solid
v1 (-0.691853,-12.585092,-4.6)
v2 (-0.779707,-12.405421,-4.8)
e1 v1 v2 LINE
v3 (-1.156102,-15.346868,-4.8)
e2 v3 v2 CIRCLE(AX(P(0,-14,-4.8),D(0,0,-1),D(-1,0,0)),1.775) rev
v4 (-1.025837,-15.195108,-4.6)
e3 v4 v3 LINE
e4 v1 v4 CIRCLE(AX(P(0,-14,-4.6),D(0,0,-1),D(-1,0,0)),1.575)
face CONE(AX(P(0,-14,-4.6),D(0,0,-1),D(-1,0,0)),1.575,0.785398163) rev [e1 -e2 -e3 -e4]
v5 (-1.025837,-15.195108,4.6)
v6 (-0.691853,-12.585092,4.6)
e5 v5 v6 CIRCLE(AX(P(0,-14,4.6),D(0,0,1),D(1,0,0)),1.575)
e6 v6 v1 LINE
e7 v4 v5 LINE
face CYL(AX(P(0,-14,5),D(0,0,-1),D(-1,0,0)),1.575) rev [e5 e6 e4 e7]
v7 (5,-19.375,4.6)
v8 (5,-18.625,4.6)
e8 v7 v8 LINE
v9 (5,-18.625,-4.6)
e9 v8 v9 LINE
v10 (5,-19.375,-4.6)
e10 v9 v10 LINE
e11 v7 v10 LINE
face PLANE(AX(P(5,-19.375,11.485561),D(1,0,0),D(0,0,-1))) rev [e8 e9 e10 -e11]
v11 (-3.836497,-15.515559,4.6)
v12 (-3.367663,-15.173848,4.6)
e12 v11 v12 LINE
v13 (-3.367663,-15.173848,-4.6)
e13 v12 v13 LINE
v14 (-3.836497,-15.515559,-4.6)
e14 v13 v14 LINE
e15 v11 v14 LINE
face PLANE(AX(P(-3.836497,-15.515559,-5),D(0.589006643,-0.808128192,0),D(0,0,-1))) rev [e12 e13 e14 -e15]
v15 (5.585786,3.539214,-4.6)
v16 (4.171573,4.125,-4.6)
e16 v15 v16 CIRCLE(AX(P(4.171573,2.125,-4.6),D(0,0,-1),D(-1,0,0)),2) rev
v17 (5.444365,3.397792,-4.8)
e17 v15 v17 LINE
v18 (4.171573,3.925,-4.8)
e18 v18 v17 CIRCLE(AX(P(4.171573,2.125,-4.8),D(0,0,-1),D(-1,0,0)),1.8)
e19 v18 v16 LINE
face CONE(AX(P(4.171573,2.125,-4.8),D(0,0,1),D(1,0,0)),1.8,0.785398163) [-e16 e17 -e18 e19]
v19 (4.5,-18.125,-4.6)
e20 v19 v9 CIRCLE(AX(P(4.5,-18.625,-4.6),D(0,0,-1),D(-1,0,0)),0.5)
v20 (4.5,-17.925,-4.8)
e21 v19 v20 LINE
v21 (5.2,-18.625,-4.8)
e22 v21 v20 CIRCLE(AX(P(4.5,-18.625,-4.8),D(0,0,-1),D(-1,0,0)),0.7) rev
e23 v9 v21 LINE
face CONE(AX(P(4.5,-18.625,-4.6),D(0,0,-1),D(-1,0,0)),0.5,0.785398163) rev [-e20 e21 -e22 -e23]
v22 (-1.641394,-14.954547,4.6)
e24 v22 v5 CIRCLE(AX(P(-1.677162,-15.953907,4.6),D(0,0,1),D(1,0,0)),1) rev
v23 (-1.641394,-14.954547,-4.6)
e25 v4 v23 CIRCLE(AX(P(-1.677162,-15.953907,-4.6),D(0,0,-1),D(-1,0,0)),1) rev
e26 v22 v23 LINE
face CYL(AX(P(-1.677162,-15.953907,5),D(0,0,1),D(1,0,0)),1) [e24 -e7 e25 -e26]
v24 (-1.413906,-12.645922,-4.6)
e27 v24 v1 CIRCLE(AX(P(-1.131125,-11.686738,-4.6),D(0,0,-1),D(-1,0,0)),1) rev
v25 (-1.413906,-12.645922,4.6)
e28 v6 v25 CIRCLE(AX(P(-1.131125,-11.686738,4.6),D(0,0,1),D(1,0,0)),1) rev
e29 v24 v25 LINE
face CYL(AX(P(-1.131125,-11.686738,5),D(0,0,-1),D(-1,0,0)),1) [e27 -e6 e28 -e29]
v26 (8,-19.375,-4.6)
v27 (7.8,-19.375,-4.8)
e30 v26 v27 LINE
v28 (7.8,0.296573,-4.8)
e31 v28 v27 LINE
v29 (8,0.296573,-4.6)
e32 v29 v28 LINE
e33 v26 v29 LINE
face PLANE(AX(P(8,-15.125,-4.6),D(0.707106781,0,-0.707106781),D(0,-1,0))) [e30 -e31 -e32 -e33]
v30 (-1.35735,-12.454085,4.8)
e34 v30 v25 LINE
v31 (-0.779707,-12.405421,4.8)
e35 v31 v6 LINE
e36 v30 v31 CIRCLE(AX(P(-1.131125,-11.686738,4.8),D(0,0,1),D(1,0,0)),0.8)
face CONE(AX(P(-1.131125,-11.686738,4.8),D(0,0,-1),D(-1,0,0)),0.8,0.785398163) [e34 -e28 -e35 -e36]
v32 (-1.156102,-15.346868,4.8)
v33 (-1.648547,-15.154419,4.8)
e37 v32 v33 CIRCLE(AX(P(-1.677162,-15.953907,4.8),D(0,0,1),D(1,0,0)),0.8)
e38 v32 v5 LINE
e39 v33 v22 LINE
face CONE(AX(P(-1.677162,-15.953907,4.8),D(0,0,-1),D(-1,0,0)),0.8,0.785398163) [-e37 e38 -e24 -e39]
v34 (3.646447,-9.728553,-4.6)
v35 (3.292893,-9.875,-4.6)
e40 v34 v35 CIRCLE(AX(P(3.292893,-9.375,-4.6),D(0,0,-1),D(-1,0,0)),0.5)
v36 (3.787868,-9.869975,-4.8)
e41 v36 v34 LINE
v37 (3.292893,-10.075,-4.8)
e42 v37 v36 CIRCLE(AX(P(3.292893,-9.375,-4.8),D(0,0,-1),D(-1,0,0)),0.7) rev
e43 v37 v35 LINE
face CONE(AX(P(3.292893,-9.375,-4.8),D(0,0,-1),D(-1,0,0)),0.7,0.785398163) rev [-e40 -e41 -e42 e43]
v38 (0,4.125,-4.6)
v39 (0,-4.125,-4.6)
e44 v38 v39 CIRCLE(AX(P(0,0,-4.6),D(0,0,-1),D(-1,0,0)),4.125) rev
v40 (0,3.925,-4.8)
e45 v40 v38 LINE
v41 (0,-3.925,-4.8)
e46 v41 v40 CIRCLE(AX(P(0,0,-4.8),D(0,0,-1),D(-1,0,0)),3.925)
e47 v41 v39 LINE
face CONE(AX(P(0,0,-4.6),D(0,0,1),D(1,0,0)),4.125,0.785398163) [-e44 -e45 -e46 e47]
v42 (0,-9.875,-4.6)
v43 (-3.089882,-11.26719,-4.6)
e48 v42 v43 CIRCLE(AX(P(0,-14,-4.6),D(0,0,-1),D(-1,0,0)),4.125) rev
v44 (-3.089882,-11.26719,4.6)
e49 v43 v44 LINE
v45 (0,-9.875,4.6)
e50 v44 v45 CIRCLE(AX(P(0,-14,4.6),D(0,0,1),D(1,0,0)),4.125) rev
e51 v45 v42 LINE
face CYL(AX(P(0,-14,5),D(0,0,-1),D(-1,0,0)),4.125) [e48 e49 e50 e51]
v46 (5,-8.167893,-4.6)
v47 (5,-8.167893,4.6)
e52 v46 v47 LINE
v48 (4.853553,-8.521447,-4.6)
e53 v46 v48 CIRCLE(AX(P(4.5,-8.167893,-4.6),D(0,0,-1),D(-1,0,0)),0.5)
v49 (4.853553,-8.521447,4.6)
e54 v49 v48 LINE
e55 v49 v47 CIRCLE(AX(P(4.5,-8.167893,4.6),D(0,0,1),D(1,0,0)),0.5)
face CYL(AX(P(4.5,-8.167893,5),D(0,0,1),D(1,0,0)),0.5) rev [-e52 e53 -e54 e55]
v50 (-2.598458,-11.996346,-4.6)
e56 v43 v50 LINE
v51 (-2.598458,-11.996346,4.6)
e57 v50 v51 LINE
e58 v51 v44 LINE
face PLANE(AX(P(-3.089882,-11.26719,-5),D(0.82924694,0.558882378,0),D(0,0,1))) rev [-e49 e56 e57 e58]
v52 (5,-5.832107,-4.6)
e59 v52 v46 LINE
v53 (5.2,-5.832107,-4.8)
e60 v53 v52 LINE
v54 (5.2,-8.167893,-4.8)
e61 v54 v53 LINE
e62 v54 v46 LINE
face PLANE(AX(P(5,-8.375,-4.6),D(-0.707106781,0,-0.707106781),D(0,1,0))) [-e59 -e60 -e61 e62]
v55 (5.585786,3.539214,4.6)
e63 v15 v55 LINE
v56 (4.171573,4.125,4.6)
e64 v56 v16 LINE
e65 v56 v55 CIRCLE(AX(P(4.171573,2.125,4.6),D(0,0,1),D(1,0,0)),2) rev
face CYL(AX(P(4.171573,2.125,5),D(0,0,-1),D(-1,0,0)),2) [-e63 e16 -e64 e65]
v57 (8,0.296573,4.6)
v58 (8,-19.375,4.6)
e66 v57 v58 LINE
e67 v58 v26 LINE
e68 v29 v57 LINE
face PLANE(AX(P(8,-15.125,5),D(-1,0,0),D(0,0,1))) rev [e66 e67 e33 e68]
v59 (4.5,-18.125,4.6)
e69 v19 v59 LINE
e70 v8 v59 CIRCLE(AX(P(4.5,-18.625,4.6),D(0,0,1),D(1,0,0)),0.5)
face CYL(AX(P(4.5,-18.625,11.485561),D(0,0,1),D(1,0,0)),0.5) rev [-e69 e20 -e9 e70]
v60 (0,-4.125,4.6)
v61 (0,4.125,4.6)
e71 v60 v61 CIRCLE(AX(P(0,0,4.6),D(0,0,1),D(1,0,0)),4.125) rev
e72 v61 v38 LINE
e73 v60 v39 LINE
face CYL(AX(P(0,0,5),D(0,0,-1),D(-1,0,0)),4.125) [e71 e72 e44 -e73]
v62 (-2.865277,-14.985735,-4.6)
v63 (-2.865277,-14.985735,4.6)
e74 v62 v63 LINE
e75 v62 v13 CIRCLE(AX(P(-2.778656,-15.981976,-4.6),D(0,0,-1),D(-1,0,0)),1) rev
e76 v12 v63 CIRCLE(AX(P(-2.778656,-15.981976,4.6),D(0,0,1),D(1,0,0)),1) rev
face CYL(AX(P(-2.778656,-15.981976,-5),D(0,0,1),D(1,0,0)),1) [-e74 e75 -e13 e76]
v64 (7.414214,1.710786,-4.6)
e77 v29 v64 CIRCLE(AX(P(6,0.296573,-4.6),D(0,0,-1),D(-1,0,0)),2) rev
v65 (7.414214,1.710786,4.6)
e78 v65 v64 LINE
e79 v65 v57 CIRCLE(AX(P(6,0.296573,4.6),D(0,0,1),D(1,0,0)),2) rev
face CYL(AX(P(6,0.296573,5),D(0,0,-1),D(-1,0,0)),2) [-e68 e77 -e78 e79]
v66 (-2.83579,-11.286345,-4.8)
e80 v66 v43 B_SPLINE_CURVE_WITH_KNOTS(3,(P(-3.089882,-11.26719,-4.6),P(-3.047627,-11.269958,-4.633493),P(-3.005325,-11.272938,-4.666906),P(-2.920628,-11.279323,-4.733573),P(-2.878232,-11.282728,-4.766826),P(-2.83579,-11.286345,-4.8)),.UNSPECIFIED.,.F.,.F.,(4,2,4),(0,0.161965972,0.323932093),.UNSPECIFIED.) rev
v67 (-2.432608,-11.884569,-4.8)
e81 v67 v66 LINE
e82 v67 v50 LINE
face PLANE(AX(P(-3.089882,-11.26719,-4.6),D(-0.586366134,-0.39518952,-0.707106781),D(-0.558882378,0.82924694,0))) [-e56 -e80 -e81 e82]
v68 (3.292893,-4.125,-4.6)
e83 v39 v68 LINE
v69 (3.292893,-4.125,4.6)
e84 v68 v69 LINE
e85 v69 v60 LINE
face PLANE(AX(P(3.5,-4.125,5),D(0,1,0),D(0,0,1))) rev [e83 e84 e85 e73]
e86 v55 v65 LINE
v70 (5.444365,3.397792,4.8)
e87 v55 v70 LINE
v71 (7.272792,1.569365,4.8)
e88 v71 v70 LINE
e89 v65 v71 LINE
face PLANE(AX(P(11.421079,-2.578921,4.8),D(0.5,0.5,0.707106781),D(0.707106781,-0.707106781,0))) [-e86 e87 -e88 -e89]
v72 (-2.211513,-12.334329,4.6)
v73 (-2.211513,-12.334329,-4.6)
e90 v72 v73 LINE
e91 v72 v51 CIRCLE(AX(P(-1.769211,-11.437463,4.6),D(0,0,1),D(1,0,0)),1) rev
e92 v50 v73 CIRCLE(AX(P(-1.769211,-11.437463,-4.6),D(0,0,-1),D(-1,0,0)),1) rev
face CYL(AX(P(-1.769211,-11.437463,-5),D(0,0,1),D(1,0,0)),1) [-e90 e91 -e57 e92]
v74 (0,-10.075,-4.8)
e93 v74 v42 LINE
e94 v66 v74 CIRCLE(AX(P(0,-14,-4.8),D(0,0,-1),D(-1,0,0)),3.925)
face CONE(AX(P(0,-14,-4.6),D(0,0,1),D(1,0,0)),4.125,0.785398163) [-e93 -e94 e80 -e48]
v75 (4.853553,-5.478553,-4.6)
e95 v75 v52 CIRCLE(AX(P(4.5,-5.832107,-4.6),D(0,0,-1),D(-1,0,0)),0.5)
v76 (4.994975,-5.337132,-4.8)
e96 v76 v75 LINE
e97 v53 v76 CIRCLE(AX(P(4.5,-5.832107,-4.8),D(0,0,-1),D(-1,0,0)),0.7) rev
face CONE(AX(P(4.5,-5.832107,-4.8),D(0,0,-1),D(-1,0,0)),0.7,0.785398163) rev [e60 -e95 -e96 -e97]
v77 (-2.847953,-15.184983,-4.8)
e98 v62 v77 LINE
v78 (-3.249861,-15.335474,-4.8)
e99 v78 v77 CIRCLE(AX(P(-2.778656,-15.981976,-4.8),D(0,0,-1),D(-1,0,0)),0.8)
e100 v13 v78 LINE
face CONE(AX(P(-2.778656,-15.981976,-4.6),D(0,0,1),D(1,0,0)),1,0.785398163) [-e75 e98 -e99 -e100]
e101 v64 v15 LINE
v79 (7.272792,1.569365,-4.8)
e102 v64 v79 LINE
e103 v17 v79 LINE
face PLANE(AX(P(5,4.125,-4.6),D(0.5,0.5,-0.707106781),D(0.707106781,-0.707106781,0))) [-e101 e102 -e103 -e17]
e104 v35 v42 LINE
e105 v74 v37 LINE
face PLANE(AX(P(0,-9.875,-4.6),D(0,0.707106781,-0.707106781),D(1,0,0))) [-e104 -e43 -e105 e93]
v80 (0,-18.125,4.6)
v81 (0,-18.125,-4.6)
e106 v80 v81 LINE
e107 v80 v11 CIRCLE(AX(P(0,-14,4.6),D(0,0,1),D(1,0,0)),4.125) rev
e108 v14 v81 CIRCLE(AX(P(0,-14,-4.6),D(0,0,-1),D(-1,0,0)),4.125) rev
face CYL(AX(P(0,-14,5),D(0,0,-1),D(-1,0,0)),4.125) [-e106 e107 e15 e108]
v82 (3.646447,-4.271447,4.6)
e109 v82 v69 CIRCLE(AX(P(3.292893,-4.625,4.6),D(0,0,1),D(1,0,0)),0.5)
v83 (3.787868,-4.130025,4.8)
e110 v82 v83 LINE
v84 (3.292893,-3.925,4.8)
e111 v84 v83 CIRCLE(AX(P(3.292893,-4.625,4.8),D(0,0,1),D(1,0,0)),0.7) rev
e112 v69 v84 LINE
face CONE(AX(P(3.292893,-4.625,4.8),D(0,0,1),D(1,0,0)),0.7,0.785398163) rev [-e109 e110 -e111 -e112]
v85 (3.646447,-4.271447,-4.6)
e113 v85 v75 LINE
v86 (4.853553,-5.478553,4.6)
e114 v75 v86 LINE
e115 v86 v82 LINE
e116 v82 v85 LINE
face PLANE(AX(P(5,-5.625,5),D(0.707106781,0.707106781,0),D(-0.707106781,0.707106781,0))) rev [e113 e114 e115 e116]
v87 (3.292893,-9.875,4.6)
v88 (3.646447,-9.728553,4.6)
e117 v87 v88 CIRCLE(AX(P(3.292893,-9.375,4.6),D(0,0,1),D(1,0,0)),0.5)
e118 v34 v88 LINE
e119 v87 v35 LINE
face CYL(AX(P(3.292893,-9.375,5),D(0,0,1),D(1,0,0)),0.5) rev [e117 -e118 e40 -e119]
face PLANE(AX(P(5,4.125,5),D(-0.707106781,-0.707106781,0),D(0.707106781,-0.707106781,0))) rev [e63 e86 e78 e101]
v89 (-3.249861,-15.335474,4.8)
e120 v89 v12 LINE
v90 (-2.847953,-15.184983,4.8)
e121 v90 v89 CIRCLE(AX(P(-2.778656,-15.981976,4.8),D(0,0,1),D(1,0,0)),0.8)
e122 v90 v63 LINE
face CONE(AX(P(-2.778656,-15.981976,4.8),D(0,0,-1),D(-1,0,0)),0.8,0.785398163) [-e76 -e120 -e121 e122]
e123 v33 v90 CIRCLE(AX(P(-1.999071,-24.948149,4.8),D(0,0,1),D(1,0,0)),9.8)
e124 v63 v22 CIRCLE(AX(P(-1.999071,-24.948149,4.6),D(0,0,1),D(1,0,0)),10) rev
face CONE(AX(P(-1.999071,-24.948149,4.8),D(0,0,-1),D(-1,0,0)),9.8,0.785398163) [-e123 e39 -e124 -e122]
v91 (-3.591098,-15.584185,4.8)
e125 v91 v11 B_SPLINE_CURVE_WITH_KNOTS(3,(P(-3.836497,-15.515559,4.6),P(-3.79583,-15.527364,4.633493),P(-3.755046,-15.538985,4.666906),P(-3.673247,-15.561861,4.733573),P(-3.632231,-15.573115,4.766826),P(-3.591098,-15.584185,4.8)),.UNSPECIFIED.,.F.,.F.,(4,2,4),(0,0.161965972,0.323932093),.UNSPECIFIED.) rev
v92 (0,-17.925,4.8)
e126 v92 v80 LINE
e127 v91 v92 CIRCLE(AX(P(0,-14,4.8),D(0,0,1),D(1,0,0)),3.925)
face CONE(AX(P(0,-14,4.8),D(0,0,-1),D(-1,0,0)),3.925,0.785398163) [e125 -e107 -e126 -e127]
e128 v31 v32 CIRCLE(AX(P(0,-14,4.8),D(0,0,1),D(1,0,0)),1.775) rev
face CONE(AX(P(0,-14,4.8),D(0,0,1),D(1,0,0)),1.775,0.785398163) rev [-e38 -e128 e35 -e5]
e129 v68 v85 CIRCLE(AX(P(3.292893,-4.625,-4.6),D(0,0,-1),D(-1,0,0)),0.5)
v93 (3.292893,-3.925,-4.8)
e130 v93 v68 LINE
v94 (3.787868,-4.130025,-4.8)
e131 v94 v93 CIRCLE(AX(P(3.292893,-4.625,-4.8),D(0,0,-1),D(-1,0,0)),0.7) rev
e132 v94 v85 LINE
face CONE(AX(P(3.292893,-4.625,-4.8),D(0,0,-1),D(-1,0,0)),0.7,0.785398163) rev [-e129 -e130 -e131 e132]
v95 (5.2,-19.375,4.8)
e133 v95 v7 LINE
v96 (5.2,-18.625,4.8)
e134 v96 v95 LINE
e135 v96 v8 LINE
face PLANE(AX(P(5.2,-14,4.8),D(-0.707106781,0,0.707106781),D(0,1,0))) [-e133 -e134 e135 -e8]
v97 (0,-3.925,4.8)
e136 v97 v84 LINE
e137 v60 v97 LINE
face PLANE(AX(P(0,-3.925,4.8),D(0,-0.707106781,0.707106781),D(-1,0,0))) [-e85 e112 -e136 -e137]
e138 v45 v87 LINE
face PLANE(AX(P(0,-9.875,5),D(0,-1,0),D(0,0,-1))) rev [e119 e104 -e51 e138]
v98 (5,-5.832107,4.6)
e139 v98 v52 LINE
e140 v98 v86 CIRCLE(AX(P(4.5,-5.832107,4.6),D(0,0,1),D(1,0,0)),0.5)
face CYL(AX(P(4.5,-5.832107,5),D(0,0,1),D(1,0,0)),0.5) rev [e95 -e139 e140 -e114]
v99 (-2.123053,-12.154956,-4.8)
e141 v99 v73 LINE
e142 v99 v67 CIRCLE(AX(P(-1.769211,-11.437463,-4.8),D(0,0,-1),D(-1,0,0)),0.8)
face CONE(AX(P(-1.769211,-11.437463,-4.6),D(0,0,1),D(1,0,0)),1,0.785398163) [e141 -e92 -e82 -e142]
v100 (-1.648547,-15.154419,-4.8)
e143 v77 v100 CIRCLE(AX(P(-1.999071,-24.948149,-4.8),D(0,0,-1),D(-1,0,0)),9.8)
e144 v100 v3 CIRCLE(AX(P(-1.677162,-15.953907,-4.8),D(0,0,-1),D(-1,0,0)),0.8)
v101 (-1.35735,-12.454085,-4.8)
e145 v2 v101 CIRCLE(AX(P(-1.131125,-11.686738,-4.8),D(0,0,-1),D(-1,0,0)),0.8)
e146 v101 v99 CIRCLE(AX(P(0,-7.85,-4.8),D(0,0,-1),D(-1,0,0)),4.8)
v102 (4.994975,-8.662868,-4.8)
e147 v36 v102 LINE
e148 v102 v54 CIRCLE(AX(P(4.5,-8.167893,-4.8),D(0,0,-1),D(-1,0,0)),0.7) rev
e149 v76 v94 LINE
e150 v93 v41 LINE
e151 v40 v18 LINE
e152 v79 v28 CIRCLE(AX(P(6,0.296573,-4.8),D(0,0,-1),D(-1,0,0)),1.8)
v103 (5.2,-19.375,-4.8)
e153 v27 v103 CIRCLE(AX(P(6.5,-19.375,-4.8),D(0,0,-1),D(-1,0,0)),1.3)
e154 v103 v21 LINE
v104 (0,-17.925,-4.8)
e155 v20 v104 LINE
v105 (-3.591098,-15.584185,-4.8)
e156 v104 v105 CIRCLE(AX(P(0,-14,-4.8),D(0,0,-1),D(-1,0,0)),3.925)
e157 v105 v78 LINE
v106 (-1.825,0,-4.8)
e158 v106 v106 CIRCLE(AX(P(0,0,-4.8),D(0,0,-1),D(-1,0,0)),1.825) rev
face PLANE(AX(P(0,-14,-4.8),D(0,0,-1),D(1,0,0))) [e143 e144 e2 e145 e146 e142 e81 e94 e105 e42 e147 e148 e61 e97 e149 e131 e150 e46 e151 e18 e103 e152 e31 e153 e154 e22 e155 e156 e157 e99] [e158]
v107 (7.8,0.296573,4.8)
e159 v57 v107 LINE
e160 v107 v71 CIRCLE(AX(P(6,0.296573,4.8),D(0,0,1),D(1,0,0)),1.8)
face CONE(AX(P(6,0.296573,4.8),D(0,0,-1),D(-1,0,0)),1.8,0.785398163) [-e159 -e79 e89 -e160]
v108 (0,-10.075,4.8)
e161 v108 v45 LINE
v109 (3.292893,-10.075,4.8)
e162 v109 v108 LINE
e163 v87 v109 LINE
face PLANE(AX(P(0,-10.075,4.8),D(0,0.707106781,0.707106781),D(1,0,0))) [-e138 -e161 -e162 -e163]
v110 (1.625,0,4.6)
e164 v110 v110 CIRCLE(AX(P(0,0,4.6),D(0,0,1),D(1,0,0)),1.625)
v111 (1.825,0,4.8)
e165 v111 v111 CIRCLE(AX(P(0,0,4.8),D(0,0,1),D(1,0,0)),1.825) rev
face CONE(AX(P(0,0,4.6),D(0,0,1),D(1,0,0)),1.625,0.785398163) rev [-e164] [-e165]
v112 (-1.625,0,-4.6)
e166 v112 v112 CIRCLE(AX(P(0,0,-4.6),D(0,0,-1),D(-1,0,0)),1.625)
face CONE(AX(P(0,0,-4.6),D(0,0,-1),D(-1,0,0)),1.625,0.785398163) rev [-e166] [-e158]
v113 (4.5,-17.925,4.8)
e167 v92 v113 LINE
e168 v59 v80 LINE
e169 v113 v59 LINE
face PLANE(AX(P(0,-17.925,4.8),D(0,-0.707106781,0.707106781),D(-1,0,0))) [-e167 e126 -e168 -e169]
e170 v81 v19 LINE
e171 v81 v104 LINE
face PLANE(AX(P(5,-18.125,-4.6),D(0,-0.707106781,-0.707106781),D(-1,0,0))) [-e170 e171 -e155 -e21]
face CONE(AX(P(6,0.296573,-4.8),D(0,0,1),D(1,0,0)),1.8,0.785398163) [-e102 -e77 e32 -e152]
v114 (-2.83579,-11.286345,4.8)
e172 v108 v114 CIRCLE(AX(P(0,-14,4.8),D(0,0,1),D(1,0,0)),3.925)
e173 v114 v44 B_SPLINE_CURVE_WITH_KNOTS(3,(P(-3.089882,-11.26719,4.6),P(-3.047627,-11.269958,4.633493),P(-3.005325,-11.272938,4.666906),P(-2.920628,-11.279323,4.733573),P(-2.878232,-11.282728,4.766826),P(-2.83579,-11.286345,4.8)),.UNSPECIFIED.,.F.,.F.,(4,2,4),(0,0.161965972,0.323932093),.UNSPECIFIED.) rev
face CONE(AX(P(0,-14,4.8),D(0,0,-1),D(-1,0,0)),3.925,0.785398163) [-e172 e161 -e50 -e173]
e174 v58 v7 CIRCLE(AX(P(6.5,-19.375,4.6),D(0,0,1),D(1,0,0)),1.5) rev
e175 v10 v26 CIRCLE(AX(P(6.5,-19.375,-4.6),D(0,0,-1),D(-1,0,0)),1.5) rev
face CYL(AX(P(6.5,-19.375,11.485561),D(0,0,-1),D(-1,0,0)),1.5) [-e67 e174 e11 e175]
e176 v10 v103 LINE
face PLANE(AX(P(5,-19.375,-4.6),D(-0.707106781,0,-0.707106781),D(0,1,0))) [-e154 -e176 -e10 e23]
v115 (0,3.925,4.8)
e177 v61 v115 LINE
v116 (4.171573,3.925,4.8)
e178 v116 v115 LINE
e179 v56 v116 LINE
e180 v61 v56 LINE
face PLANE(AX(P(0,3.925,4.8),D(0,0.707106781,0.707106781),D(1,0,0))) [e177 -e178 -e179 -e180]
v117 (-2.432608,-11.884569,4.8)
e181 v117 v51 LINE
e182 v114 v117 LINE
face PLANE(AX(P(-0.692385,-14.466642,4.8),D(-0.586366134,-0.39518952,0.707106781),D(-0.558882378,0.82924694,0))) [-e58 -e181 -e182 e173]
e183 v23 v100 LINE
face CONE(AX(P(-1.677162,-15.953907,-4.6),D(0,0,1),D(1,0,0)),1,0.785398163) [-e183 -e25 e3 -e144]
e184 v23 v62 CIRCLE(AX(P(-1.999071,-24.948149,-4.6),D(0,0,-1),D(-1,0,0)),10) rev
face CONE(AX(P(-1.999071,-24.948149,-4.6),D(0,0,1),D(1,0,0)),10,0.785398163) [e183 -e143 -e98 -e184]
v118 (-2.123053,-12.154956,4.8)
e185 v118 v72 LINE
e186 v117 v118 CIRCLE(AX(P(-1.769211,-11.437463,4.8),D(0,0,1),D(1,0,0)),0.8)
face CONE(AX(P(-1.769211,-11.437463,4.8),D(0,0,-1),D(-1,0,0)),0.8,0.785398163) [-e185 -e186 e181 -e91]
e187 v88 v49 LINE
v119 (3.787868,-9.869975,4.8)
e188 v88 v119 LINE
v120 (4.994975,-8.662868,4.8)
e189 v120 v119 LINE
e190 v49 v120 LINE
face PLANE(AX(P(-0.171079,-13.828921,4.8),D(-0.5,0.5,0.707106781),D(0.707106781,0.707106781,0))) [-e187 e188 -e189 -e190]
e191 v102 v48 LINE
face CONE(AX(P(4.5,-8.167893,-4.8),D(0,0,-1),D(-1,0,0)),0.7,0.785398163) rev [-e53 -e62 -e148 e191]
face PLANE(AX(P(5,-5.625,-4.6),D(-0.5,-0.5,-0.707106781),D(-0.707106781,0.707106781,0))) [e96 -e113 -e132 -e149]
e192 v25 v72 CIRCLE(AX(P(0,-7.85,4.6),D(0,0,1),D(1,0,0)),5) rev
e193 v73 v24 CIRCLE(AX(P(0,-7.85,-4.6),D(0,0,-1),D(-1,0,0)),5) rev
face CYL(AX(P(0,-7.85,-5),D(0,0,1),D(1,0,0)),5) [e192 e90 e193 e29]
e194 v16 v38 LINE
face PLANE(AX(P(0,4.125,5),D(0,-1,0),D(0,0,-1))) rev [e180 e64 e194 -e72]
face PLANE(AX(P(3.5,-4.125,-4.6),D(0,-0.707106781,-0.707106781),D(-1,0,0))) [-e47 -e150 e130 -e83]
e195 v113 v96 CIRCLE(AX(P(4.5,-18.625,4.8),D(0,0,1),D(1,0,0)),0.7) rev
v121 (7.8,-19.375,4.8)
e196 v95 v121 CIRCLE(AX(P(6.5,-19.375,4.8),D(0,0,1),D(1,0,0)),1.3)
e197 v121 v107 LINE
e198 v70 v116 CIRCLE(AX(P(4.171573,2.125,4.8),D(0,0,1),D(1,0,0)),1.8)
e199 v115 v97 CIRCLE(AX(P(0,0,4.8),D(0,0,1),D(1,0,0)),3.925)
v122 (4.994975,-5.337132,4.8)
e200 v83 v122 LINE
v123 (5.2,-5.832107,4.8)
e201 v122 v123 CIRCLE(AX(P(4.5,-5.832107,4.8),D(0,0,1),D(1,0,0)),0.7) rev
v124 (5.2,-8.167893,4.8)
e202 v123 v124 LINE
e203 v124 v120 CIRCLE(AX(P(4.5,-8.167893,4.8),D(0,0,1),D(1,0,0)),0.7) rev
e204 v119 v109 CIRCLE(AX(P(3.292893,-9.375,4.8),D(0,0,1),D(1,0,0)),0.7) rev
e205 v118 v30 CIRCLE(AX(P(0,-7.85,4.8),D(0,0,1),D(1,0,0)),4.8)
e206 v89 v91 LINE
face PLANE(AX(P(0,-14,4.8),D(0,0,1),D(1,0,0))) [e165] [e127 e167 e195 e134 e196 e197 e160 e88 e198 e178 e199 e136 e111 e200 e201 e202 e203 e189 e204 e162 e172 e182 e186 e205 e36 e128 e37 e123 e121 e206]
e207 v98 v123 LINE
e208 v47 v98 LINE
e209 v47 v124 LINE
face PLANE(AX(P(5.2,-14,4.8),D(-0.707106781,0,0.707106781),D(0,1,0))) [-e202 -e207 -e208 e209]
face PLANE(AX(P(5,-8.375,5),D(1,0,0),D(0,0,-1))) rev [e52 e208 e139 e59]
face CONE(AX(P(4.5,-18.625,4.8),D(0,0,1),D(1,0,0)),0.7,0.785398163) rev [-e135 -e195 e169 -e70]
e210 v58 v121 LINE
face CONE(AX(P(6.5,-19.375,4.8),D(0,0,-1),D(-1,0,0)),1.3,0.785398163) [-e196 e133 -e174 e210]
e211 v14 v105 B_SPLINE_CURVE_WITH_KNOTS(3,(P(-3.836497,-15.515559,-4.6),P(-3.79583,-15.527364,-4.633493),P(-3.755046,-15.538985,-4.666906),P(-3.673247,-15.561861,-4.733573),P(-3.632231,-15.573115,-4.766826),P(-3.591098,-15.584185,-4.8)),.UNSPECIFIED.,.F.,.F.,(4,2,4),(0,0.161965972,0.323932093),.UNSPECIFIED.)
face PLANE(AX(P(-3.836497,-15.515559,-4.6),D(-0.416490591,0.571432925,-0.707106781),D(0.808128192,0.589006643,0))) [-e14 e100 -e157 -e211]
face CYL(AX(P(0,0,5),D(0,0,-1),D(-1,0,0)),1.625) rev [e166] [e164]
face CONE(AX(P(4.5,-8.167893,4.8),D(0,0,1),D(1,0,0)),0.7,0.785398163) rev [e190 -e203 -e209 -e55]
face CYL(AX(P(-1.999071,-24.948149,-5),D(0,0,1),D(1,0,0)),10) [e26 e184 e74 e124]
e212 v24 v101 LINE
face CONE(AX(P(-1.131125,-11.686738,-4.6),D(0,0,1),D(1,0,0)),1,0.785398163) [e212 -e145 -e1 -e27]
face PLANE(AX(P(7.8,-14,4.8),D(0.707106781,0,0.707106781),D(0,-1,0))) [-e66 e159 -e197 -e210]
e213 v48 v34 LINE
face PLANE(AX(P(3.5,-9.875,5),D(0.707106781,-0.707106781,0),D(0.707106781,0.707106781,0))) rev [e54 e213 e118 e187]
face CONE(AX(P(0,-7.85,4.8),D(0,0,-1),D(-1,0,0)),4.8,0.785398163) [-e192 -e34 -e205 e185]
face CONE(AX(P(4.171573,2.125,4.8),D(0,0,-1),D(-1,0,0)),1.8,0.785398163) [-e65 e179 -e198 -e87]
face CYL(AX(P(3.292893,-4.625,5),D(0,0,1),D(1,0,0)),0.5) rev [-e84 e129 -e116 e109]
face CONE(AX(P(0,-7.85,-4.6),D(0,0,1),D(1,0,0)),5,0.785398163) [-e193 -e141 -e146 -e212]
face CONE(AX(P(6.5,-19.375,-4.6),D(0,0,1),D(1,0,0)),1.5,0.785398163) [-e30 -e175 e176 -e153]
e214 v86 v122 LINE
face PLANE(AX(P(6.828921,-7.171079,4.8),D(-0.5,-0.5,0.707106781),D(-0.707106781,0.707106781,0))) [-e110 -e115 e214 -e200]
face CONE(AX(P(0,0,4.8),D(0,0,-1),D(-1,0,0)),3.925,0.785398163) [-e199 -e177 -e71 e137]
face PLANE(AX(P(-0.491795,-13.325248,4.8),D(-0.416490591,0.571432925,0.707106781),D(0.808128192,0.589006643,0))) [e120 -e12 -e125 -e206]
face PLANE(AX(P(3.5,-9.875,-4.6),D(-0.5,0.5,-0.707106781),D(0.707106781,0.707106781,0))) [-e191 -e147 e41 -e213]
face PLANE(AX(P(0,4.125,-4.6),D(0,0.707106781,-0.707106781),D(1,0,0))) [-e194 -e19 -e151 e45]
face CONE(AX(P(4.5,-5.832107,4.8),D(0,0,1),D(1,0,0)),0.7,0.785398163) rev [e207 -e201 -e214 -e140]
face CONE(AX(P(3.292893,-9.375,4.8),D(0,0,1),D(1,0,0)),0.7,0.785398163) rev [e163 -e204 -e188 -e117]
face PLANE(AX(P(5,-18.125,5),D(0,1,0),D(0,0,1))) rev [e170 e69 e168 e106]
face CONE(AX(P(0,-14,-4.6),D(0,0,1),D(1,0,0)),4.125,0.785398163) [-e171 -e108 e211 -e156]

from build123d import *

# Parameters (mm, degrees)
SKETCH2_R                         = 1.575
SKETCH2_R_2                       = 1.625
BOSS_EXTRUDE1_DEPTH               = 5
LATCH_NOTCH_DEPTH                 = 21.433199089
LATCH_NOTCH_DEPTH_BACK            = 21.433199089
FILLET2_R                         = 1
THUMB_BUMP_LONG_REACH             = 22.433
THUMB_BUMP_LONG_DIRECTION_2_REACH = 22.433
FILLET6_R                         = 0.5
MOVEMENT_CLEARANCE_DEPTH          = 0.2
FILLET3_R                         = 2
FILLET4_R                         = 0.5
CHAMFER2_SIZE                     = 0.2


with BuildPart() as part:
    # Sketch2 → Boss-Extrude1 (new, symmetric)
    with BuildSketch(Plane.XY):
        with BuildLine():
            Line((8, -15.125), (8, 1.125))
            Line((8, 1.125), (5, 4.125))
            Line((5, 4.125), (0, 4.125))
            ThreePointArc((0, 4.125), (-4.125, 0), (0, -4.125))
            Line((0, -4.125), (3.5, -4.125))
            Line((3.5, -4.125), (5, -5.625))
            Line((5, -5.625), (5, -8.375))
            Line((5, -8.375), (3.5, -9.875))
            Line((3.5, -9.875), (0, -9.875))
            ThreePointArc((0, -9.875), (-4.125, -14), (0, -18.125))
            Line((0, -18.125), (5, -18.125))
            Line((5, -18.125), (8, -15.125))
        make_face()
        with Locations((0, -14)):
            Circle(SKETCH2_R, mode=Mode.SUBTRACT)
        Circle(SKETCH2_R_2, mode=Mode.SUBTRACT)
    extrude(amount=BOSS_EXTRUDE1_DEPTH, both=True)

    # Sketch3 → Latch Notch (cut, two sides: drawn at the far end of the back side and taken through both)
    with BuildSketch(Plane.XY.offset(-LATCH_NOTCH_DEPTH_BACK)):
        with BuildLine():
            Line((-5.189425986, -13.053442339), (-4.352006159, -10.311715335))
            ThreePointArc((-4.352006159, -10.311715335), (-2.519069602, -12.169061048), (0, -12.85))
            Line((0, -12.85), (0, -15.15))
            ThreePointArc((0, -15.15), (-3.063481939, -15.004958499), (-6.026845813, -15.795169343))
            Line((-6.026845813, -15.795169343), (-5.189425986, -13.053442339))
        make_face()
    extrude(amount=LATCH_NOTCH_DEPTH + LATCH_NOTCH_DEPTH_BACK, mode=Mode.SUBTRACT)

    # Chamfer1
    # the kernel refuses this chamfer: 1.535901437, 0.897551306, 0.4 mm, written as the material it takes off along each edge
    with BuildSketch(Plane(origin=(-3.336286816, -11.574136179, -7.844626154), x_dir=(0.8125376228226495, -0.5829087505756949, 0), z_dir=(0, 0, 1))) as chamfer1_piece_1:
        with BuildLine():
            Line((1.080053984, 0), (0.021291111, 0.393036797))
            ThreePointArc((0.021291111, 0.393036797), (0.006455038, 0.205821568), (0, 0))
            ThreePointArc((0, 0), (0.568931585, -0.029164914), (1.080053984, 0))
        make_face()
    extrude(amount=15.689252309, mode=Mode.SUBTRACT)
    with BuildSketch(Plane(origin=(-3.96348247, -15.142992437, -7.141629453), x_dir=(0.3226160511275448, -0.9465299168831746, 0), z_dir=(0, 0, 1))) as chamfer1_piece_2:
        with BuildLine():
            Line((0.393613053, 0), (0.141125799, 0.8123737))
            ThreePointArc((0.141125799, 0.8123737), (0.064933685, 0.423381867), (0, 0))
            ThreePointArc((0, 0), (0.202118313, -0.004694141), (0.393613053, 0))
        make_face()
    extrude(amount=14.283258906, mode=Mode.SUBTRACT)

    # Fillet2
    fillet2_edges = [part.edges().sort_by_distance(p)[0] for p in [
        (-1.235054025, -14.977377387, 0),
        (-0.965763736, -12.755843496, 0),
        (-3.149017011, -15.014487433, 0),
        (-2.45870232, -12.203709097, 0),
    ]]
    fillet(fillet2_edges, radius=FILLET2_R)

    # Thumb Bump LONG: up to this face of the body (flat: up to its plane)
    thumb_bump_long_end = Plane(part.part.faces().sort_by_distance((-2.247358014, -15.204704165, 5))[0])
    # Sketch6 → Thumb Bump LONG (add, up to the picked face)
    with BuildSketch(Plane.XY, mode=Mode.PRIVATE) as thumb_bump_long_sk1:
        with BuildLine():
            Line((8, -15.125), (8, -19.375))
            ThreePointArc((8, -19.375), (6.5, -20.875), (5, -19.375))
            Line((5, -19.375), (5, -18.125))
            Line((5, -18.125), (8, -15.125))
        make_face()
    thumb_bump_long_tool1 = split(extrude(thumb_bump_long_sk1.sketch, amount=THUMB_BUMP_LONG_REACH, mode=Mode.PRIVATE), bisect_by=thumb_bump_long_end, keep=Keep.BOTH, mode=Mode.PRIVATE)
    add(thumb_bump_long_tool1.solids().sort_by(Axis((6.690932, -18.50785, 0), (0, 0, 1)))[0])

    # Thumb Bump LONG direction 2: up to this face of the body (flat: up to its plane)
    thumb_bump_long_direction_2_end = Plane(part.part.faces().sort_by_distance((-2.247358014, -15.204704165, -5))[0])
    # Sketch6 → Thumb Bump LONG direction 2 (add, up to the picked face)
    with BuildSketch(Plane.XY, mode=Mode.PRIVATE) as thumb_bump_long_direction_2_sk1:
        with BuildLine():
            Line((8, -15.125), (8, -19.375))
            ThreePointArc((8, -19.375), (6.5, -20.875), (5, -19.375))
            Line((5, -19.375), (5, -18.125))
            Line((5, -18.125), (8, -15.125))
        make_face()
    thumb_bump_long_direction_2_tool1 = split(extrude(thumb_bump_long_direction_2_sk1.sketch, amount=-THUMB_BUMP_LONG_DIRECTION_2_REACH, mode=Mode.PRIVATE), bisect_by=thumb_bump_long_direction_2_end, keep=Keep.BOTH, mode=Mode.PRIVATE)
    add(thumb_bump_long_direction_2_tool1.solids().sort_by(Axis((6.690932, -18.50785, 0), (0, 0, -1)))[0])

    # Fillet6
    fillet6_edges = [part.edges().sort_by_distance(p)[0] for p in [
        (5, -18.125, 0),
    ]]
    fillet(fillet6_edges, radius=FILLET6_R)

    # Sketch5 → Movement Clearance (cut)
    with BuildSketch(Plane.XY.offset(5)):
        with BuildLine():
            Line((-3.367662745, -15.173848028), (-3.836496581, -15.515558967))
            ThreePointArc((-3.836496581, -15.515558967), (-2.319907785, -17.410814107), (0, -18.125))
            Line((0, -18.125), (4.5, -18.125))
            ThreePointArc((4.5, -18.125), (4.853553391, -18.271446609), (5, -18.625))
            Line((5, -18.625), (5, -19.375))
            ThreePointArc((5, -19.375), (6.5, -20.875), (8, -19.375))
            Line((8, -19.375), (8, 1.125))
            Line((8, 1.125), (5, 4.125))
            Line((5, 4.125), (0, 4.125))
            ThreePointArc((0, 4.125), (-4.125, 0), (0, -4.125))
            Line((0, -4.125), (3.5, -4.125))
            Line((3.5, -4.125), (5, -5.625))
            Line((5, -5.625), (5, -8.375))
            Line((5, -8.375), (3.5, -9.875))
            Line((3.5, -9.875), (0, -9.875))
            ThreePointArc((0, -9.875), (-1.694518043, -10.239117976), (-3.089882399, -11.267189769))
            Line((-3.089882399, -11.267189769), (-2.598457721, -11.996345718))
            ThreePointArc((-2.598457721, -11.996345718), (-2.427061693, -12.190611517), (-2.211513476, -12.334329174))
            ThreePointArc((-2.211513476, -12.334329174), (-1.819392443, -12.507232133), (-1.413905836, -12.645922256))
            ThreePointArc((-1.413905836, -12.645922256), (-1.047175867, -12.683207874), (-0.691852953, -12.585092055))
            ThreePointArc((-0.691852953, -12.585092055), (1.562261425, -14.19991058), (-1.025836674, -15.195108412))
            ThreePointArc((-1.025836674, -15.195108412), (-1.313167774, -15.022506023), (-1.641393845, -14.954547274))
            ThreePointArc((-1.641393845, -14.954547274), (-2.253812991, -14.951393788), (-2.865276684, -14.985734846))
            ThreePointArc((-2.865276684, -14.985734846), (-3.129319301, -15.04547458), (-3.367662745, -15.173848028))
        make_face()
    movement_clearance = extrude(amount=-MOVEMENT_CLEARANCE_DEPTH, mode=Mode.SUBTRACT)

    # Movement Clearance 2: Movement Clearance across plane
    add(movement_clearance.mirror(Plane.XY), mode=Mode.SUBTRACT)

    # Fillet3
    fillet3_edges = [part.edges().sort_by_distance(p)[0] for p in [
        (5, 4.125, 0),
        (8, 1.125, 0),
    ]]
    fillet(fillet3_edges, radius=FILLET3_R)

    # Fillet4
    fillet4_edges = [part.edges().sort_by_distance(p)[0] for p in [
        (3.5, -9.875, 0),
        (5, -8.375, 0),
        (5, -5.625, 0),
        (3.5, -4.125, 0),
    ]]
    fillet(fillet4_edges, radius=FILLET4_R)

    # Chamfer2
    chamfer2_edges = [part.edges().sort_by_distance(p)[0] for p in [
        (-2.319907785, -17.410814107, 4.8),
        (-3.602079663, -15.344703498, 4.8),
        (-3.129319301, -15.04547458, 4.8),
        (-2.253812991, -14.951393788, 4.8),
        (-1.313167774, -15.022506023, 4.8),
        (1.562261425, -14.19991058, 4.8),
        (-1.047175867, -12.683207874, 4.8),
        (-1.819392443, -12.507232133, 4.8),
        (-2.427061693, -12.190611517, 4.8),
        (-2.84417006, -11.631767743, 4.8),
        (-1.694518043, -10.239117976, 4.8),
        (1.646446609, -4.125, 4.8),
        (-4.125, 0, 4.8),
        (8, -9.539213562, 4.8),
        (6.5, -20.875, 4.8),
        (5, -19, 4.8),
        (4.853553391, -18.271446609, 4.8),
        (2.25, -18.125, 4.8),
        (-1.625, 0, 4.8),
        (-1.625, 0, -4.8),
        (-2.319907785, -17.410814107, -4.8),
        (2.25, -18.125, -4.8),
        (4.853553391, -18.271446609, -4.8),
        (5, -19, -4.8),
        (6.5, -20.875, -4.8),
        (8, -9.539213562, -4.8),
        (-4.125, 0, -4.8),
        (1.646446609, -4.125, -4.8),
        (-1.694518043, -10.239117976, -4.8),
        (-2.84417006, -11.631767743, -4.8),
        (-2.427061693, -12.190611517, -4.8),
        (-1.819392443, -12.507232133, -4.8),
        (-1.047175867, -12.683207874, -4.8),
        (1.562261425, -14.19991058, -4.8),
        (-1.313167774, -15.022506023, -4.8),
        (-2.253812991, -14.951393788, -4.8),
        (-3.129319301, -15.04547458, -4.8),
        (-3.602079663, -15.344703498, -4.8),
        (6.5, 2.625, -4.8),
        (6.5, 2.625, 4.8),
        (2.085786438, 4.125, -4.8),
        (4.93693974, 3.972759065, -4.8),
        (7.847759065, 1.06193974, -4.8),
        (2.085786438, 4.125, 4.8),
        (4.93693974, 3.972759065, 4.8),
        (7.847759065, 1.06193974, 4.8),
        (1.646446609, -9.875, -4.8),
        (1.646446609, -9.875, 4.8),
        (4.25, -9.125, -4.8),
        (4.25, -9.125, 4.8),
        (5, -7, -4.8),
        (5, -7, 4.8),
        (4.25, -4.875, -4.8),
        (4.25, -4.875, 4.8),
        (3.484234935, -9.836939766, -4.8),
        (3.484234935, -9.836939766, 4.8),
        (4.961939766, -8.359234935, -4.8),
        (4.961939766, -8.359234935, 4.8),
        (4.961939766, -5.640765065, -4.8),
        (4.961939766, -5.640765065, 4.8),
        (3.484234935, -4.163060234, -4.8),
        (3.484234935, -4.163060234, 4.8),
    ]]
    chamfer(chamfer2_edges, length=CHAMFER2_SIZE)


solid = part.part
